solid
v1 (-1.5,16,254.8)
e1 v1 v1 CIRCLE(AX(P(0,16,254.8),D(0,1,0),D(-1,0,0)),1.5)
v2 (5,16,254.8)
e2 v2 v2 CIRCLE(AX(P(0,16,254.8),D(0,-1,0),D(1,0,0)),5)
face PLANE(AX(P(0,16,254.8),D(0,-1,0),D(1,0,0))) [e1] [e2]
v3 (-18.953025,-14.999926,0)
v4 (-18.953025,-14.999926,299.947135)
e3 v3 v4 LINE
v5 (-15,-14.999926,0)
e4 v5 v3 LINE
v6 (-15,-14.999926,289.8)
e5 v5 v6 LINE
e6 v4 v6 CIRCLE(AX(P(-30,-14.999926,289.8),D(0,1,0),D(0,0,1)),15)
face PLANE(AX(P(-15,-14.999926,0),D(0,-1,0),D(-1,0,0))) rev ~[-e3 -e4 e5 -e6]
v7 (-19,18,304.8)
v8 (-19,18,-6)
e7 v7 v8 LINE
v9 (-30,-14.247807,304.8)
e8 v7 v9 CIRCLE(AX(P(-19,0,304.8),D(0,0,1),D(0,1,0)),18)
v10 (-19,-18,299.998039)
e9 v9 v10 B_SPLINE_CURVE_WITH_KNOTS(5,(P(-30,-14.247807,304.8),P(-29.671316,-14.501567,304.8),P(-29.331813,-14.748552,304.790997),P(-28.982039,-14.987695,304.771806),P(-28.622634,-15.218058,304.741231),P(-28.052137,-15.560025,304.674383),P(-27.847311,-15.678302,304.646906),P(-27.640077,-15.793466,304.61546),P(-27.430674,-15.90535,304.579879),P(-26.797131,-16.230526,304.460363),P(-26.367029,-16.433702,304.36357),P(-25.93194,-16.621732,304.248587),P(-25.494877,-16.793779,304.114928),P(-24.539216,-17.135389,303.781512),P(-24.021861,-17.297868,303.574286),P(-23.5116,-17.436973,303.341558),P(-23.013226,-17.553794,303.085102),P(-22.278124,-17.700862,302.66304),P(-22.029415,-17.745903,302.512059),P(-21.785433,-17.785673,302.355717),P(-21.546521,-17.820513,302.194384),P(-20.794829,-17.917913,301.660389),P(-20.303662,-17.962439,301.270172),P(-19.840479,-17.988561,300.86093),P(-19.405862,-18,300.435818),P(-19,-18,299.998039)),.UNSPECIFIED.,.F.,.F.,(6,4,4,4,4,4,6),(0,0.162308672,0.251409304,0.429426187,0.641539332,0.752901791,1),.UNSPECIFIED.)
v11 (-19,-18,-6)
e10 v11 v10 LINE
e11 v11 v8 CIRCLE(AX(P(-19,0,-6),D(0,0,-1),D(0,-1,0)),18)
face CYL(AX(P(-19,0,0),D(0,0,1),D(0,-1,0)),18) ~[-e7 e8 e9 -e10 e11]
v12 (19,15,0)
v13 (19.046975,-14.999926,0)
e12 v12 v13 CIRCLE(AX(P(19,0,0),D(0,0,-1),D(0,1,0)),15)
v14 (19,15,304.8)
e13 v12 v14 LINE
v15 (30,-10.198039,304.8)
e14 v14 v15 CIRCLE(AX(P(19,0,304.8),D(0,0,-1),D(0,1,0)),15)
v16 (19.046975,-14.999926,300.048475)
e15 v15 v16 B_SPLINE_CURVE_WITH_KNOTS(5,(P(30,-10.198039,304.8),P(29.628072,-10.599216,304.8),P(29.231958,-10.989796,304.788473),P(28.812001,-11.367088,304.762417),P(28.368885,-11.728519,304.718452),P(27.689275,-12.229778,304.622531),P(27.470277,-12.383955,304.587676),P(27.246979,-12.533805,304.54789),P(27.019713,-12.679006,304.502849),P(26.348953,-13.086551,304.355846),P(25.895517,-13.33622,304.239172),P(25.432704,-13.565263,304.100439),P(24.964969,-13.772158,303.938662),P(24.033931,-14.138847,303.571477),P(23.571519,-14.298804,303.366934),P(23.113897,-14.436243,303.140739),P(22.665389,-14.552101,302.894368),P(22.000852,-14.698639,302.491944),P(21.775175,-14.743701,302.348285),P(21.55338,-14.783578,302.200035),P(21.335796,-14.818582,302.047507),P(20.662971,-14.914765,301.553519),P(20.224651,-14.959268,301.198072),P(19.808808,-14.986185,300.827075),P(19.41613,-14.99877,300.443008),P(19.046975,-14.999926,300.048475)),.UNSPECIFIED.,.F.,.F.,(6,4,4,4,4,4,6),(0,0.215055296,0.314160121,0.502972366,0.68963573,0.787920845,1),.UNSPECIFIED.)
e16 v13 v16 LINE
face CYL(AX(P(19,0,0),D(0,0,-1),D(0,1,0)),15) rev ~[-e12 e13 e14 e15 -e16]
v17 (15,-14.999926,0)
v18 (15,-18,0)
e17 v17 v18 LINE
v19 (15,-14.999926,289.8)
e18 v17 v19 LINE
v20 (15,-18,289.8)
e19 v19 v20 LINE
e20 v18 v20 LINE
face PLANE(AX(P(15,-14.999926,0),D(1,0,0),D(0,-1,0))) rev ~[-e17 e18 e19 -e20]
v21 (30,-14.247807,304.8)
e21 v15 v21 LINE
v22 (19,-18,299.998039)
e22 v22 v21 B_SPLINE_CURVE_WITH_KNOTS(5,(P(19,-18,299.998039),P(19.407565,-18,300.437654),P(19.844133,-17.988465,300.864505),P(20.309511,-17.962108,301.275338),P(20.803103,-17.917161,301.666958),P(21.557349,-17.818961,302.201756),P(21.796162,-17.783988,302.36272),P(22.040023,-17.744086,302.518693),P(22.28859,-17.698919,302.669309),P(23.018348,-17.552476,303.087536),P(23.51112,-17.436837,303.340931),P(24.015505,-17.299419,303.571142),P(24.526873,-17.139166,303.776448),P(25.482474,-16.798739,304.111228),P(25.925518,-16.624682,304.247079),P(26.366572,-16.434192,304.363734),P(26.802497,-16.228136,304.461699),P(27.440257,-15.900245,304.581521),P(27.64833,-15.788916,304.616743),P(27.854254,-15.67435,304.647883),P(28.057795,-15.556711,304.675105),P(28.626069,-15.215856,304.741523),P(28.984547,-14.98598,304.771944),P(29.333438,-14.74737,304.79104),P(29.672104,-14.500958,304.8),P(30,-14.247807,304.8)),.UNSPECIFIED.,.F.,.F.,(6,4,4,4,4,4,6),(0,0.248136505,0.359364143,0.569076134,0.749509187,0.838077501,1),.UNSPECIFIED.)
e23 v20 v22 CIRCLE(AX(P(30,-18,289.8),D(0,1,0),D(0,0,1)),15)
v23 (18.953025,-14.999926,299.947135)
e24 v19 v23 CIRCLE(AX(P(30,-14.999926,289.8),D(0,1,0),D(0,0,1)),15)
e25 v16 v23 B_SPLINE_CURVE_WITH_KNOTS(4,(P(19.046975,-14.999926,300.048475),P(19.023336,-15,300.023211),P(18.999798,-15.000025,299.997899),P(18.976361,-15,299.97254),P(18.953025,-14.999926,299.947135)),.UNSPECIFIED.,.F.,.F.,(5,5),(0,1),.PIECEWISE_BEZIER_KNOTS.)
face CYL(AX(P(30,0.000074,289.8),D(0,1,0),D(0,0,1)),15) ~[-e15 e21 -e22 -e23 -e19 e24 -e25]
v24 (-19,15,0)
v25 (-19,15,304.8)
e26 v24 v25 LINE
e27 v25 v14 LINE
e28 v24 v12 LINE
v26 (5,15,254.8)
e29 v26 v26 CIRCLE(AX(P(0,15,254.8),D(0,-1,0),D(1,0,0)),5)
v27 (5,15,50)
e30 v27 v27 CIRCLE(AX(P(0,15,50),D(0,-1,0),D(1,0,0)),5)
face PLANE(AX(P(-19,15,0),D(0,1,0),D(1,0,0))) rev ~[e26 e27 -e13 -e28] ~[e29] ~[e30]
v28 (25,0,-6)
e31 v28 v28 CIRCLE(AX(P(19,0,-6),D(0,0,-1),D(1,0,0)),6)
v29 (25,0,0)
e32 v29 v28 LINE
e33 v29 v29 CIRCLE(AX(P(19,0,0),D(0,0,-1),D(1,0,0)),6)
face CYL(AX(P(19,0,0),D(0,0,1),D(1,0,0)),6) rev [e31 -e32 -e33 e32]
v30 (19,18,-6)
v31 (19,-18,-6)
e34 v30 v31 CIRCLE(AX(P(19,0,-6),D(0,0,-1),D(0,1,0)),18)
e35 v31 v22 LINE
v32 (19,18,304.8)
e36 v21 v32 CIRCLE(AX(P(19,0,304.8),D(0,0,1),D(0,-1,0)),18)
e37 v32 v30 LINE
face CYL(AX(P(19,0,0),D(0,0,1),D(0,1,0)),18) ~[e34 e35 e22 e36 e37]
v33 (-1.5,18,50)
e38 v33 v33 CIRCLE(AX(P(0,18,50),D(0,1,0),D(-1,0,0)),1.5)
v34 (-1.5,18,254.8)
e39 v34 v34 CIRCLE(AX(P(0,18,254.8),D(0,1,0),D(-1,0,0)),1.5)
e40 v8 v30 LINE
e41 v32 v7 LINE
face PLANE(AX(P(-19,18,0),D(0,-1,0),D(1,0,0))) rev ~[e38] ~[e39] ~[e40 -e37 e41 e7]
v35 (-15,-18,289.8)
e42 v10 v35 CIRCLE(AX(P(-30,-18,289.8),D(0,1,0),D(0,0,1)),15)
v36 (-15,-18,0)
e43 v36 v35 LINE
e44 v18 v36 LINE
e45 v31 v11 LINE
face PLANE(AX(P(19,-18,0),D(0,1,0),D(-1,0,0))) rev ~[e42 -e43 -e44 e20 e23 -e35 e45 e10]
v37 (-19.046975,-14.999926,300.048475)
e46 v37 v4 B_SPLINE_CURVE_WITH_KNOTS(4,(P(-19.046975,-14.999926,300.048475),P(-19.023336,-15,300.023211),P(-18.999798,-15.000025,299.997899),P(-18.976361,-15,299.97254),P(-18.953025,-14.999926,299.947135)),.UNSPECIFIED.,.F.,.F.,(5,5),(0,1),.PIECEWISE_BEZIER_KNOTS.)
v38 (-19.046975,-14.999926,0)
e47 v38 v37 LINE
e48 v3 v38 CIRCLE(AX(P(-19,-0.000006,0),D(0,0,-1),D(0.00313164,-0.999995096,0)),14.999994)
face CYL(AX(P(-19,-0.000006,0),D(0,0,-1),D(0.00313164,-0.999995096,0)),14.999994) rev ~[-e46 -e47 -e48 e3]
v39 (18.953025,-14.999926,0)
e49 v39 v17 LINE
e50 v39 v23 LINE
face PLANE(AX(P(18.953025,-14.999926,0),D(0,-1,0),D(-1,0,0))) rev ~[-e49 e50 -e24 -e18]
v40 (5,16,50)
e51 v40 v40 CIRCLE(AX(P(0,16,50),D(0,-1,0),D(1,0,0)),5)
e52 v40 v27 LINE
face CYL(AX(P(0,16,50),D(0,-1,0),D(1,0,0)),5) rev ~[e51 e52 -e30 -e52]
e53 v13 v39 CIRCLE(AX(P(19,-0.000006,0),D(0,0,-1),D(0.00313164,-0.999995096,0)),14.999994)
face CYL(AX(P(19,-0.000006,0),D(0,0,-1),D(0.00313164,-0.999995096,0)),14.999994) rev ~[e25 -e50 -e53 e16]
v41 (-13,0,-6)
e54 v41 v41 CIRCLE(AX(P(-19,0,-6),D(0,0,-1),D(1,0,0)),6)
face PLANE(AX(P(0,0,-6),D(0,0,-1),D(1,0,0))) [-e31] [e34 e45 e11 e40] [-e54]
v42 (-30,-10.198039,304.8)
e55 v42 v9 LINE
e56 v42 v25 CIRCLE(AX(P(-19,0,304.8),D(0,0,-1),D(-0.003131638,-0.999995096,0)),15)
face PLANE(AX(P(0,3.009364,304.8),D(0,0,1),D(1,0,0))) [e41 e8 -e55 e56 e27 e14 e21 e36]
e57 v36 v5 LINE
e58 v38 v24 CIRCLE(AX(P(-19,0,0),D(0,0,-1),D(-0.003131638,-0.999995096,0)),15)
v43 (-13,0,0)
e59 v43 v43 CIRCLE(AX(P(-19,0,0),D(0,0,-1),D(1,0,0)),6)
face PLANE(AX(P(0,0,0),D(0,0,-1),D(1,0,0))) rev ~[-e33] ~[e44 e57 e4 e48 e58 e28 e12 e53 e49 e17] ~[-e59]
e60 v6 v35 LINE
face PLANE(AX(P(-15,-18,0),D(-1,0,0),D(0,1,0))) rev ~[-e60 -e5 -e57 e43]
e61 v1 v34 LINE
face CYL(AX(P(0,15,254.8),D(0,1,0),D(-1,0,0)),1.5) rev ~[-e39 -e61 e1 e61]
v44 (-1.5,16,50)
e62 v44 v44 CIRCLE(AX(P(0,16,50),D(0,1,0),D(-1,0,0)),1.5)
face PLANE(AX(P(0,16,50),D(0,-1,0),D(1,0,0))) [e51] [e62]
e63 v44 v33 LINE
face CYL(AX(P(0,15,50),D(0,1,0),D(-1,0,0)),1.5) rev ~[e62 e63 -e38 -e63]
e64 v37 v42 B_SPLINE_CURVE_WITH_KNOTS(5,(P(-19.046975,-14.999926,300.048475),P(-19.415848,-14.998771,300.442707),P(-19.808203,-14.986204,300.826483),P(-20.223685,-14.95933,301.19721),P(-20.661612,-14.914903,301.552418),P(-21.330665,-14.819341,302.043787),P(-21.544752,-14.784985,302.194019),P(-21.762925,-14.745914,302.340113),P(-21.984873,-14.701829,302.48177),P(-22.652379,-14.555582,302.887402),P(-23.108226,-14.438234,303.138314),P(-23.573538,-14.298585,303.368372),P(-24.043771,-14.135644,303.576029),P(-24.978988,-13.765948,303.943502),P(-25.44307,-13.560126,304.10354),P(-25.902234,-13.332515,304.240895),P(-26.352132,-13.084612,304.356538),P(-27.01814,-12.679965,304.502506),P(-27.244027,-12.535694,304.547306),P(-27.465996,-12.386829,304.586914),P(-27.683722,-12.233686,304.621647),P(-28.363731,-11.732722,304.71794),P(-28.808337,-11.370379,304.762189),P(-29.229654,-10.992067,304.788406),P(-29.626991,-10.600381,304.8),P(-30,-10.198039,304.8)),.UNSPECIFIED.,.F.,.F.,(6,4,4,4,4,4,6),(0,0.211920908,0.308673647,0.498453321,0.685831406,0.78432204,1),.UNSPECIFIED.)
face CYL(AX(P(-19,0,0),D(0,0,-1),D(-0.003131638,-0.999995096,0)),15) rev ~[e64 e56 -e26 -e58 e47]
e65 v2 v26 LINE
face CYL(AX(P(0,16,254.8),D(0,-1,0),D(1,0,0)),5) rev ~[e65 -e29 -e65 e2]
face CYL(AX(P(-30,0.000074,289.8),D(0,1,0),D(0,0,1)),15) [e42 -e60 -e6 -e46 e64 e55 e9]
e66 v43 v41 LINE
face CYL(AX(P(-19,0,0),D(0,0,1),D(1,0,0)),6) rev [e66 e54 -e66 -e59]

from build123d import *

# Parameters (mm, degrees)
F1_DEPTH       = 304.8
F2_T1_DEPTH    = 33.0000735539
F4_D           = 3
F4_CBORE_D     = 10
F4_CBORE_DEPTH = 1
F5_R           = 6
F6_DEPTH       = 6


# Not quite as in the source:
# - a fillet or chamfer that OpenCascade refuses, or shapes differently, is made with other operations: its cross-section is extruded or revolved along the edge and cut away or added


with BuildPart() as f1:
    # F0 (on Top) → F1 (new body)
    with BuildSketch(Plane.XY):
        with BuildLine():
            ThreePointArc((-19.0469745753, -14.9999264461), (-33.9999816115, 0.0234873165), (-19, 15))
            Line((-19, 15), (0, 15))
            Line((0, 15), (19, 15))
            ThreePointArc((19, 15), (33.9999816115, 0.0234873165), (19.0469745753, -14.9999264461))
            ThreePointArc((19.0469745753, -14.9999264461), (19, -15), (18.9530254247, -14.9999264461))
            Line((18.9530254247, -14.9999264461), (15, -14.9999264461))
            Line((15, -14.9999264461), (15, -18))
            Line((15, -18), (19, -18))
            ThreePointArc((19, -18), (37, 0), (19, 18))
            Line((19, 18), (0, 18))
            Line((0, 18), (-19, 18))
            ThreePointArc((-19, 18), (-37, 0), (-19, -18))
            Line((-19, -18), (-15, -18))
            Line((-15, -18), (-15, -14.9999264461))
            Line((-15, -14.9999264461), (-18.9530254247, -14.9999264461))
            ThreePointArc((-18.9530254247, -14.9999264461), (-19, -15), (-19.0469745753, -14.9999264461))
        make_face()
    extrude(amount=F1_DEPTH)

    # F2: fillet of radius 15 on 2 edges, made by hand

    # F2_s2 → F2_t1 (cut)
    with BuildSketch(Plane.XZ.offset(-7.35539e-05)):
        with BuildLine():
            ThreePointArc((-30, 304.8), (-19.3933982822, 300.4066017178), (-15, 289.8))
            Line((-15, 289.8), (-14.7, 289.8))
            Line((-14.7, 289.8), (-14.7, 305.1))
            Line((-14.7, 305.1), (-30, 305.1))
            Line((-30, 305.1), (-30, 304.8))
        make_face()
        with BuildLine():
            ThreePointArc((30, 304.8), (19.3933982822, 300.4066017178), (15, 289.8))
            Line((15, 289.8), (14.7, 289.8))
            Line((14.7, 289.8), (14.7, 305.1))
            Line((14.7, 305.1), (30, 305.1))
            Line((30, 305.1), (30, 304.8))
        make_face()
    extrude(amount=F2_T1_DEPTH, mode=Mode.SUBTRACT)

    # F4 (through all)
    with Locations(Plane.XZ.offset(-15)):
        with Locations((0, 254.8), (0, 50)):
            CounterBoreHole(F4_D / 2, F4_CBORE_D / 2, F4_CBORE_DEPTH)

    # F5 (on face) → F6 (join)
    with BuildSketch(Plane(origin=(0, 0, 0), x_dir=(1, 0, 0), z_dir=(0, 0, -1))):
        with BuildLine():
            ThreePointArc((-19, 18), (-37, 0), (-19, -18))
            Line((-19, -18), (19, -18))
            ThreePointArc((19, -18), (37, 0), (19, 18))
            Line((19, 18), (-19, 18))
        make_face()
        with Locations((-19, 0)):
            Circle(F5_R, mode=Mode.SUBTRACT)
        with Locations((19, 0)):
            Circle(F5_R, mode=Mode.SUBTRACT)
    extrude(amount=F6_DEPTH)


solid = f1.part
